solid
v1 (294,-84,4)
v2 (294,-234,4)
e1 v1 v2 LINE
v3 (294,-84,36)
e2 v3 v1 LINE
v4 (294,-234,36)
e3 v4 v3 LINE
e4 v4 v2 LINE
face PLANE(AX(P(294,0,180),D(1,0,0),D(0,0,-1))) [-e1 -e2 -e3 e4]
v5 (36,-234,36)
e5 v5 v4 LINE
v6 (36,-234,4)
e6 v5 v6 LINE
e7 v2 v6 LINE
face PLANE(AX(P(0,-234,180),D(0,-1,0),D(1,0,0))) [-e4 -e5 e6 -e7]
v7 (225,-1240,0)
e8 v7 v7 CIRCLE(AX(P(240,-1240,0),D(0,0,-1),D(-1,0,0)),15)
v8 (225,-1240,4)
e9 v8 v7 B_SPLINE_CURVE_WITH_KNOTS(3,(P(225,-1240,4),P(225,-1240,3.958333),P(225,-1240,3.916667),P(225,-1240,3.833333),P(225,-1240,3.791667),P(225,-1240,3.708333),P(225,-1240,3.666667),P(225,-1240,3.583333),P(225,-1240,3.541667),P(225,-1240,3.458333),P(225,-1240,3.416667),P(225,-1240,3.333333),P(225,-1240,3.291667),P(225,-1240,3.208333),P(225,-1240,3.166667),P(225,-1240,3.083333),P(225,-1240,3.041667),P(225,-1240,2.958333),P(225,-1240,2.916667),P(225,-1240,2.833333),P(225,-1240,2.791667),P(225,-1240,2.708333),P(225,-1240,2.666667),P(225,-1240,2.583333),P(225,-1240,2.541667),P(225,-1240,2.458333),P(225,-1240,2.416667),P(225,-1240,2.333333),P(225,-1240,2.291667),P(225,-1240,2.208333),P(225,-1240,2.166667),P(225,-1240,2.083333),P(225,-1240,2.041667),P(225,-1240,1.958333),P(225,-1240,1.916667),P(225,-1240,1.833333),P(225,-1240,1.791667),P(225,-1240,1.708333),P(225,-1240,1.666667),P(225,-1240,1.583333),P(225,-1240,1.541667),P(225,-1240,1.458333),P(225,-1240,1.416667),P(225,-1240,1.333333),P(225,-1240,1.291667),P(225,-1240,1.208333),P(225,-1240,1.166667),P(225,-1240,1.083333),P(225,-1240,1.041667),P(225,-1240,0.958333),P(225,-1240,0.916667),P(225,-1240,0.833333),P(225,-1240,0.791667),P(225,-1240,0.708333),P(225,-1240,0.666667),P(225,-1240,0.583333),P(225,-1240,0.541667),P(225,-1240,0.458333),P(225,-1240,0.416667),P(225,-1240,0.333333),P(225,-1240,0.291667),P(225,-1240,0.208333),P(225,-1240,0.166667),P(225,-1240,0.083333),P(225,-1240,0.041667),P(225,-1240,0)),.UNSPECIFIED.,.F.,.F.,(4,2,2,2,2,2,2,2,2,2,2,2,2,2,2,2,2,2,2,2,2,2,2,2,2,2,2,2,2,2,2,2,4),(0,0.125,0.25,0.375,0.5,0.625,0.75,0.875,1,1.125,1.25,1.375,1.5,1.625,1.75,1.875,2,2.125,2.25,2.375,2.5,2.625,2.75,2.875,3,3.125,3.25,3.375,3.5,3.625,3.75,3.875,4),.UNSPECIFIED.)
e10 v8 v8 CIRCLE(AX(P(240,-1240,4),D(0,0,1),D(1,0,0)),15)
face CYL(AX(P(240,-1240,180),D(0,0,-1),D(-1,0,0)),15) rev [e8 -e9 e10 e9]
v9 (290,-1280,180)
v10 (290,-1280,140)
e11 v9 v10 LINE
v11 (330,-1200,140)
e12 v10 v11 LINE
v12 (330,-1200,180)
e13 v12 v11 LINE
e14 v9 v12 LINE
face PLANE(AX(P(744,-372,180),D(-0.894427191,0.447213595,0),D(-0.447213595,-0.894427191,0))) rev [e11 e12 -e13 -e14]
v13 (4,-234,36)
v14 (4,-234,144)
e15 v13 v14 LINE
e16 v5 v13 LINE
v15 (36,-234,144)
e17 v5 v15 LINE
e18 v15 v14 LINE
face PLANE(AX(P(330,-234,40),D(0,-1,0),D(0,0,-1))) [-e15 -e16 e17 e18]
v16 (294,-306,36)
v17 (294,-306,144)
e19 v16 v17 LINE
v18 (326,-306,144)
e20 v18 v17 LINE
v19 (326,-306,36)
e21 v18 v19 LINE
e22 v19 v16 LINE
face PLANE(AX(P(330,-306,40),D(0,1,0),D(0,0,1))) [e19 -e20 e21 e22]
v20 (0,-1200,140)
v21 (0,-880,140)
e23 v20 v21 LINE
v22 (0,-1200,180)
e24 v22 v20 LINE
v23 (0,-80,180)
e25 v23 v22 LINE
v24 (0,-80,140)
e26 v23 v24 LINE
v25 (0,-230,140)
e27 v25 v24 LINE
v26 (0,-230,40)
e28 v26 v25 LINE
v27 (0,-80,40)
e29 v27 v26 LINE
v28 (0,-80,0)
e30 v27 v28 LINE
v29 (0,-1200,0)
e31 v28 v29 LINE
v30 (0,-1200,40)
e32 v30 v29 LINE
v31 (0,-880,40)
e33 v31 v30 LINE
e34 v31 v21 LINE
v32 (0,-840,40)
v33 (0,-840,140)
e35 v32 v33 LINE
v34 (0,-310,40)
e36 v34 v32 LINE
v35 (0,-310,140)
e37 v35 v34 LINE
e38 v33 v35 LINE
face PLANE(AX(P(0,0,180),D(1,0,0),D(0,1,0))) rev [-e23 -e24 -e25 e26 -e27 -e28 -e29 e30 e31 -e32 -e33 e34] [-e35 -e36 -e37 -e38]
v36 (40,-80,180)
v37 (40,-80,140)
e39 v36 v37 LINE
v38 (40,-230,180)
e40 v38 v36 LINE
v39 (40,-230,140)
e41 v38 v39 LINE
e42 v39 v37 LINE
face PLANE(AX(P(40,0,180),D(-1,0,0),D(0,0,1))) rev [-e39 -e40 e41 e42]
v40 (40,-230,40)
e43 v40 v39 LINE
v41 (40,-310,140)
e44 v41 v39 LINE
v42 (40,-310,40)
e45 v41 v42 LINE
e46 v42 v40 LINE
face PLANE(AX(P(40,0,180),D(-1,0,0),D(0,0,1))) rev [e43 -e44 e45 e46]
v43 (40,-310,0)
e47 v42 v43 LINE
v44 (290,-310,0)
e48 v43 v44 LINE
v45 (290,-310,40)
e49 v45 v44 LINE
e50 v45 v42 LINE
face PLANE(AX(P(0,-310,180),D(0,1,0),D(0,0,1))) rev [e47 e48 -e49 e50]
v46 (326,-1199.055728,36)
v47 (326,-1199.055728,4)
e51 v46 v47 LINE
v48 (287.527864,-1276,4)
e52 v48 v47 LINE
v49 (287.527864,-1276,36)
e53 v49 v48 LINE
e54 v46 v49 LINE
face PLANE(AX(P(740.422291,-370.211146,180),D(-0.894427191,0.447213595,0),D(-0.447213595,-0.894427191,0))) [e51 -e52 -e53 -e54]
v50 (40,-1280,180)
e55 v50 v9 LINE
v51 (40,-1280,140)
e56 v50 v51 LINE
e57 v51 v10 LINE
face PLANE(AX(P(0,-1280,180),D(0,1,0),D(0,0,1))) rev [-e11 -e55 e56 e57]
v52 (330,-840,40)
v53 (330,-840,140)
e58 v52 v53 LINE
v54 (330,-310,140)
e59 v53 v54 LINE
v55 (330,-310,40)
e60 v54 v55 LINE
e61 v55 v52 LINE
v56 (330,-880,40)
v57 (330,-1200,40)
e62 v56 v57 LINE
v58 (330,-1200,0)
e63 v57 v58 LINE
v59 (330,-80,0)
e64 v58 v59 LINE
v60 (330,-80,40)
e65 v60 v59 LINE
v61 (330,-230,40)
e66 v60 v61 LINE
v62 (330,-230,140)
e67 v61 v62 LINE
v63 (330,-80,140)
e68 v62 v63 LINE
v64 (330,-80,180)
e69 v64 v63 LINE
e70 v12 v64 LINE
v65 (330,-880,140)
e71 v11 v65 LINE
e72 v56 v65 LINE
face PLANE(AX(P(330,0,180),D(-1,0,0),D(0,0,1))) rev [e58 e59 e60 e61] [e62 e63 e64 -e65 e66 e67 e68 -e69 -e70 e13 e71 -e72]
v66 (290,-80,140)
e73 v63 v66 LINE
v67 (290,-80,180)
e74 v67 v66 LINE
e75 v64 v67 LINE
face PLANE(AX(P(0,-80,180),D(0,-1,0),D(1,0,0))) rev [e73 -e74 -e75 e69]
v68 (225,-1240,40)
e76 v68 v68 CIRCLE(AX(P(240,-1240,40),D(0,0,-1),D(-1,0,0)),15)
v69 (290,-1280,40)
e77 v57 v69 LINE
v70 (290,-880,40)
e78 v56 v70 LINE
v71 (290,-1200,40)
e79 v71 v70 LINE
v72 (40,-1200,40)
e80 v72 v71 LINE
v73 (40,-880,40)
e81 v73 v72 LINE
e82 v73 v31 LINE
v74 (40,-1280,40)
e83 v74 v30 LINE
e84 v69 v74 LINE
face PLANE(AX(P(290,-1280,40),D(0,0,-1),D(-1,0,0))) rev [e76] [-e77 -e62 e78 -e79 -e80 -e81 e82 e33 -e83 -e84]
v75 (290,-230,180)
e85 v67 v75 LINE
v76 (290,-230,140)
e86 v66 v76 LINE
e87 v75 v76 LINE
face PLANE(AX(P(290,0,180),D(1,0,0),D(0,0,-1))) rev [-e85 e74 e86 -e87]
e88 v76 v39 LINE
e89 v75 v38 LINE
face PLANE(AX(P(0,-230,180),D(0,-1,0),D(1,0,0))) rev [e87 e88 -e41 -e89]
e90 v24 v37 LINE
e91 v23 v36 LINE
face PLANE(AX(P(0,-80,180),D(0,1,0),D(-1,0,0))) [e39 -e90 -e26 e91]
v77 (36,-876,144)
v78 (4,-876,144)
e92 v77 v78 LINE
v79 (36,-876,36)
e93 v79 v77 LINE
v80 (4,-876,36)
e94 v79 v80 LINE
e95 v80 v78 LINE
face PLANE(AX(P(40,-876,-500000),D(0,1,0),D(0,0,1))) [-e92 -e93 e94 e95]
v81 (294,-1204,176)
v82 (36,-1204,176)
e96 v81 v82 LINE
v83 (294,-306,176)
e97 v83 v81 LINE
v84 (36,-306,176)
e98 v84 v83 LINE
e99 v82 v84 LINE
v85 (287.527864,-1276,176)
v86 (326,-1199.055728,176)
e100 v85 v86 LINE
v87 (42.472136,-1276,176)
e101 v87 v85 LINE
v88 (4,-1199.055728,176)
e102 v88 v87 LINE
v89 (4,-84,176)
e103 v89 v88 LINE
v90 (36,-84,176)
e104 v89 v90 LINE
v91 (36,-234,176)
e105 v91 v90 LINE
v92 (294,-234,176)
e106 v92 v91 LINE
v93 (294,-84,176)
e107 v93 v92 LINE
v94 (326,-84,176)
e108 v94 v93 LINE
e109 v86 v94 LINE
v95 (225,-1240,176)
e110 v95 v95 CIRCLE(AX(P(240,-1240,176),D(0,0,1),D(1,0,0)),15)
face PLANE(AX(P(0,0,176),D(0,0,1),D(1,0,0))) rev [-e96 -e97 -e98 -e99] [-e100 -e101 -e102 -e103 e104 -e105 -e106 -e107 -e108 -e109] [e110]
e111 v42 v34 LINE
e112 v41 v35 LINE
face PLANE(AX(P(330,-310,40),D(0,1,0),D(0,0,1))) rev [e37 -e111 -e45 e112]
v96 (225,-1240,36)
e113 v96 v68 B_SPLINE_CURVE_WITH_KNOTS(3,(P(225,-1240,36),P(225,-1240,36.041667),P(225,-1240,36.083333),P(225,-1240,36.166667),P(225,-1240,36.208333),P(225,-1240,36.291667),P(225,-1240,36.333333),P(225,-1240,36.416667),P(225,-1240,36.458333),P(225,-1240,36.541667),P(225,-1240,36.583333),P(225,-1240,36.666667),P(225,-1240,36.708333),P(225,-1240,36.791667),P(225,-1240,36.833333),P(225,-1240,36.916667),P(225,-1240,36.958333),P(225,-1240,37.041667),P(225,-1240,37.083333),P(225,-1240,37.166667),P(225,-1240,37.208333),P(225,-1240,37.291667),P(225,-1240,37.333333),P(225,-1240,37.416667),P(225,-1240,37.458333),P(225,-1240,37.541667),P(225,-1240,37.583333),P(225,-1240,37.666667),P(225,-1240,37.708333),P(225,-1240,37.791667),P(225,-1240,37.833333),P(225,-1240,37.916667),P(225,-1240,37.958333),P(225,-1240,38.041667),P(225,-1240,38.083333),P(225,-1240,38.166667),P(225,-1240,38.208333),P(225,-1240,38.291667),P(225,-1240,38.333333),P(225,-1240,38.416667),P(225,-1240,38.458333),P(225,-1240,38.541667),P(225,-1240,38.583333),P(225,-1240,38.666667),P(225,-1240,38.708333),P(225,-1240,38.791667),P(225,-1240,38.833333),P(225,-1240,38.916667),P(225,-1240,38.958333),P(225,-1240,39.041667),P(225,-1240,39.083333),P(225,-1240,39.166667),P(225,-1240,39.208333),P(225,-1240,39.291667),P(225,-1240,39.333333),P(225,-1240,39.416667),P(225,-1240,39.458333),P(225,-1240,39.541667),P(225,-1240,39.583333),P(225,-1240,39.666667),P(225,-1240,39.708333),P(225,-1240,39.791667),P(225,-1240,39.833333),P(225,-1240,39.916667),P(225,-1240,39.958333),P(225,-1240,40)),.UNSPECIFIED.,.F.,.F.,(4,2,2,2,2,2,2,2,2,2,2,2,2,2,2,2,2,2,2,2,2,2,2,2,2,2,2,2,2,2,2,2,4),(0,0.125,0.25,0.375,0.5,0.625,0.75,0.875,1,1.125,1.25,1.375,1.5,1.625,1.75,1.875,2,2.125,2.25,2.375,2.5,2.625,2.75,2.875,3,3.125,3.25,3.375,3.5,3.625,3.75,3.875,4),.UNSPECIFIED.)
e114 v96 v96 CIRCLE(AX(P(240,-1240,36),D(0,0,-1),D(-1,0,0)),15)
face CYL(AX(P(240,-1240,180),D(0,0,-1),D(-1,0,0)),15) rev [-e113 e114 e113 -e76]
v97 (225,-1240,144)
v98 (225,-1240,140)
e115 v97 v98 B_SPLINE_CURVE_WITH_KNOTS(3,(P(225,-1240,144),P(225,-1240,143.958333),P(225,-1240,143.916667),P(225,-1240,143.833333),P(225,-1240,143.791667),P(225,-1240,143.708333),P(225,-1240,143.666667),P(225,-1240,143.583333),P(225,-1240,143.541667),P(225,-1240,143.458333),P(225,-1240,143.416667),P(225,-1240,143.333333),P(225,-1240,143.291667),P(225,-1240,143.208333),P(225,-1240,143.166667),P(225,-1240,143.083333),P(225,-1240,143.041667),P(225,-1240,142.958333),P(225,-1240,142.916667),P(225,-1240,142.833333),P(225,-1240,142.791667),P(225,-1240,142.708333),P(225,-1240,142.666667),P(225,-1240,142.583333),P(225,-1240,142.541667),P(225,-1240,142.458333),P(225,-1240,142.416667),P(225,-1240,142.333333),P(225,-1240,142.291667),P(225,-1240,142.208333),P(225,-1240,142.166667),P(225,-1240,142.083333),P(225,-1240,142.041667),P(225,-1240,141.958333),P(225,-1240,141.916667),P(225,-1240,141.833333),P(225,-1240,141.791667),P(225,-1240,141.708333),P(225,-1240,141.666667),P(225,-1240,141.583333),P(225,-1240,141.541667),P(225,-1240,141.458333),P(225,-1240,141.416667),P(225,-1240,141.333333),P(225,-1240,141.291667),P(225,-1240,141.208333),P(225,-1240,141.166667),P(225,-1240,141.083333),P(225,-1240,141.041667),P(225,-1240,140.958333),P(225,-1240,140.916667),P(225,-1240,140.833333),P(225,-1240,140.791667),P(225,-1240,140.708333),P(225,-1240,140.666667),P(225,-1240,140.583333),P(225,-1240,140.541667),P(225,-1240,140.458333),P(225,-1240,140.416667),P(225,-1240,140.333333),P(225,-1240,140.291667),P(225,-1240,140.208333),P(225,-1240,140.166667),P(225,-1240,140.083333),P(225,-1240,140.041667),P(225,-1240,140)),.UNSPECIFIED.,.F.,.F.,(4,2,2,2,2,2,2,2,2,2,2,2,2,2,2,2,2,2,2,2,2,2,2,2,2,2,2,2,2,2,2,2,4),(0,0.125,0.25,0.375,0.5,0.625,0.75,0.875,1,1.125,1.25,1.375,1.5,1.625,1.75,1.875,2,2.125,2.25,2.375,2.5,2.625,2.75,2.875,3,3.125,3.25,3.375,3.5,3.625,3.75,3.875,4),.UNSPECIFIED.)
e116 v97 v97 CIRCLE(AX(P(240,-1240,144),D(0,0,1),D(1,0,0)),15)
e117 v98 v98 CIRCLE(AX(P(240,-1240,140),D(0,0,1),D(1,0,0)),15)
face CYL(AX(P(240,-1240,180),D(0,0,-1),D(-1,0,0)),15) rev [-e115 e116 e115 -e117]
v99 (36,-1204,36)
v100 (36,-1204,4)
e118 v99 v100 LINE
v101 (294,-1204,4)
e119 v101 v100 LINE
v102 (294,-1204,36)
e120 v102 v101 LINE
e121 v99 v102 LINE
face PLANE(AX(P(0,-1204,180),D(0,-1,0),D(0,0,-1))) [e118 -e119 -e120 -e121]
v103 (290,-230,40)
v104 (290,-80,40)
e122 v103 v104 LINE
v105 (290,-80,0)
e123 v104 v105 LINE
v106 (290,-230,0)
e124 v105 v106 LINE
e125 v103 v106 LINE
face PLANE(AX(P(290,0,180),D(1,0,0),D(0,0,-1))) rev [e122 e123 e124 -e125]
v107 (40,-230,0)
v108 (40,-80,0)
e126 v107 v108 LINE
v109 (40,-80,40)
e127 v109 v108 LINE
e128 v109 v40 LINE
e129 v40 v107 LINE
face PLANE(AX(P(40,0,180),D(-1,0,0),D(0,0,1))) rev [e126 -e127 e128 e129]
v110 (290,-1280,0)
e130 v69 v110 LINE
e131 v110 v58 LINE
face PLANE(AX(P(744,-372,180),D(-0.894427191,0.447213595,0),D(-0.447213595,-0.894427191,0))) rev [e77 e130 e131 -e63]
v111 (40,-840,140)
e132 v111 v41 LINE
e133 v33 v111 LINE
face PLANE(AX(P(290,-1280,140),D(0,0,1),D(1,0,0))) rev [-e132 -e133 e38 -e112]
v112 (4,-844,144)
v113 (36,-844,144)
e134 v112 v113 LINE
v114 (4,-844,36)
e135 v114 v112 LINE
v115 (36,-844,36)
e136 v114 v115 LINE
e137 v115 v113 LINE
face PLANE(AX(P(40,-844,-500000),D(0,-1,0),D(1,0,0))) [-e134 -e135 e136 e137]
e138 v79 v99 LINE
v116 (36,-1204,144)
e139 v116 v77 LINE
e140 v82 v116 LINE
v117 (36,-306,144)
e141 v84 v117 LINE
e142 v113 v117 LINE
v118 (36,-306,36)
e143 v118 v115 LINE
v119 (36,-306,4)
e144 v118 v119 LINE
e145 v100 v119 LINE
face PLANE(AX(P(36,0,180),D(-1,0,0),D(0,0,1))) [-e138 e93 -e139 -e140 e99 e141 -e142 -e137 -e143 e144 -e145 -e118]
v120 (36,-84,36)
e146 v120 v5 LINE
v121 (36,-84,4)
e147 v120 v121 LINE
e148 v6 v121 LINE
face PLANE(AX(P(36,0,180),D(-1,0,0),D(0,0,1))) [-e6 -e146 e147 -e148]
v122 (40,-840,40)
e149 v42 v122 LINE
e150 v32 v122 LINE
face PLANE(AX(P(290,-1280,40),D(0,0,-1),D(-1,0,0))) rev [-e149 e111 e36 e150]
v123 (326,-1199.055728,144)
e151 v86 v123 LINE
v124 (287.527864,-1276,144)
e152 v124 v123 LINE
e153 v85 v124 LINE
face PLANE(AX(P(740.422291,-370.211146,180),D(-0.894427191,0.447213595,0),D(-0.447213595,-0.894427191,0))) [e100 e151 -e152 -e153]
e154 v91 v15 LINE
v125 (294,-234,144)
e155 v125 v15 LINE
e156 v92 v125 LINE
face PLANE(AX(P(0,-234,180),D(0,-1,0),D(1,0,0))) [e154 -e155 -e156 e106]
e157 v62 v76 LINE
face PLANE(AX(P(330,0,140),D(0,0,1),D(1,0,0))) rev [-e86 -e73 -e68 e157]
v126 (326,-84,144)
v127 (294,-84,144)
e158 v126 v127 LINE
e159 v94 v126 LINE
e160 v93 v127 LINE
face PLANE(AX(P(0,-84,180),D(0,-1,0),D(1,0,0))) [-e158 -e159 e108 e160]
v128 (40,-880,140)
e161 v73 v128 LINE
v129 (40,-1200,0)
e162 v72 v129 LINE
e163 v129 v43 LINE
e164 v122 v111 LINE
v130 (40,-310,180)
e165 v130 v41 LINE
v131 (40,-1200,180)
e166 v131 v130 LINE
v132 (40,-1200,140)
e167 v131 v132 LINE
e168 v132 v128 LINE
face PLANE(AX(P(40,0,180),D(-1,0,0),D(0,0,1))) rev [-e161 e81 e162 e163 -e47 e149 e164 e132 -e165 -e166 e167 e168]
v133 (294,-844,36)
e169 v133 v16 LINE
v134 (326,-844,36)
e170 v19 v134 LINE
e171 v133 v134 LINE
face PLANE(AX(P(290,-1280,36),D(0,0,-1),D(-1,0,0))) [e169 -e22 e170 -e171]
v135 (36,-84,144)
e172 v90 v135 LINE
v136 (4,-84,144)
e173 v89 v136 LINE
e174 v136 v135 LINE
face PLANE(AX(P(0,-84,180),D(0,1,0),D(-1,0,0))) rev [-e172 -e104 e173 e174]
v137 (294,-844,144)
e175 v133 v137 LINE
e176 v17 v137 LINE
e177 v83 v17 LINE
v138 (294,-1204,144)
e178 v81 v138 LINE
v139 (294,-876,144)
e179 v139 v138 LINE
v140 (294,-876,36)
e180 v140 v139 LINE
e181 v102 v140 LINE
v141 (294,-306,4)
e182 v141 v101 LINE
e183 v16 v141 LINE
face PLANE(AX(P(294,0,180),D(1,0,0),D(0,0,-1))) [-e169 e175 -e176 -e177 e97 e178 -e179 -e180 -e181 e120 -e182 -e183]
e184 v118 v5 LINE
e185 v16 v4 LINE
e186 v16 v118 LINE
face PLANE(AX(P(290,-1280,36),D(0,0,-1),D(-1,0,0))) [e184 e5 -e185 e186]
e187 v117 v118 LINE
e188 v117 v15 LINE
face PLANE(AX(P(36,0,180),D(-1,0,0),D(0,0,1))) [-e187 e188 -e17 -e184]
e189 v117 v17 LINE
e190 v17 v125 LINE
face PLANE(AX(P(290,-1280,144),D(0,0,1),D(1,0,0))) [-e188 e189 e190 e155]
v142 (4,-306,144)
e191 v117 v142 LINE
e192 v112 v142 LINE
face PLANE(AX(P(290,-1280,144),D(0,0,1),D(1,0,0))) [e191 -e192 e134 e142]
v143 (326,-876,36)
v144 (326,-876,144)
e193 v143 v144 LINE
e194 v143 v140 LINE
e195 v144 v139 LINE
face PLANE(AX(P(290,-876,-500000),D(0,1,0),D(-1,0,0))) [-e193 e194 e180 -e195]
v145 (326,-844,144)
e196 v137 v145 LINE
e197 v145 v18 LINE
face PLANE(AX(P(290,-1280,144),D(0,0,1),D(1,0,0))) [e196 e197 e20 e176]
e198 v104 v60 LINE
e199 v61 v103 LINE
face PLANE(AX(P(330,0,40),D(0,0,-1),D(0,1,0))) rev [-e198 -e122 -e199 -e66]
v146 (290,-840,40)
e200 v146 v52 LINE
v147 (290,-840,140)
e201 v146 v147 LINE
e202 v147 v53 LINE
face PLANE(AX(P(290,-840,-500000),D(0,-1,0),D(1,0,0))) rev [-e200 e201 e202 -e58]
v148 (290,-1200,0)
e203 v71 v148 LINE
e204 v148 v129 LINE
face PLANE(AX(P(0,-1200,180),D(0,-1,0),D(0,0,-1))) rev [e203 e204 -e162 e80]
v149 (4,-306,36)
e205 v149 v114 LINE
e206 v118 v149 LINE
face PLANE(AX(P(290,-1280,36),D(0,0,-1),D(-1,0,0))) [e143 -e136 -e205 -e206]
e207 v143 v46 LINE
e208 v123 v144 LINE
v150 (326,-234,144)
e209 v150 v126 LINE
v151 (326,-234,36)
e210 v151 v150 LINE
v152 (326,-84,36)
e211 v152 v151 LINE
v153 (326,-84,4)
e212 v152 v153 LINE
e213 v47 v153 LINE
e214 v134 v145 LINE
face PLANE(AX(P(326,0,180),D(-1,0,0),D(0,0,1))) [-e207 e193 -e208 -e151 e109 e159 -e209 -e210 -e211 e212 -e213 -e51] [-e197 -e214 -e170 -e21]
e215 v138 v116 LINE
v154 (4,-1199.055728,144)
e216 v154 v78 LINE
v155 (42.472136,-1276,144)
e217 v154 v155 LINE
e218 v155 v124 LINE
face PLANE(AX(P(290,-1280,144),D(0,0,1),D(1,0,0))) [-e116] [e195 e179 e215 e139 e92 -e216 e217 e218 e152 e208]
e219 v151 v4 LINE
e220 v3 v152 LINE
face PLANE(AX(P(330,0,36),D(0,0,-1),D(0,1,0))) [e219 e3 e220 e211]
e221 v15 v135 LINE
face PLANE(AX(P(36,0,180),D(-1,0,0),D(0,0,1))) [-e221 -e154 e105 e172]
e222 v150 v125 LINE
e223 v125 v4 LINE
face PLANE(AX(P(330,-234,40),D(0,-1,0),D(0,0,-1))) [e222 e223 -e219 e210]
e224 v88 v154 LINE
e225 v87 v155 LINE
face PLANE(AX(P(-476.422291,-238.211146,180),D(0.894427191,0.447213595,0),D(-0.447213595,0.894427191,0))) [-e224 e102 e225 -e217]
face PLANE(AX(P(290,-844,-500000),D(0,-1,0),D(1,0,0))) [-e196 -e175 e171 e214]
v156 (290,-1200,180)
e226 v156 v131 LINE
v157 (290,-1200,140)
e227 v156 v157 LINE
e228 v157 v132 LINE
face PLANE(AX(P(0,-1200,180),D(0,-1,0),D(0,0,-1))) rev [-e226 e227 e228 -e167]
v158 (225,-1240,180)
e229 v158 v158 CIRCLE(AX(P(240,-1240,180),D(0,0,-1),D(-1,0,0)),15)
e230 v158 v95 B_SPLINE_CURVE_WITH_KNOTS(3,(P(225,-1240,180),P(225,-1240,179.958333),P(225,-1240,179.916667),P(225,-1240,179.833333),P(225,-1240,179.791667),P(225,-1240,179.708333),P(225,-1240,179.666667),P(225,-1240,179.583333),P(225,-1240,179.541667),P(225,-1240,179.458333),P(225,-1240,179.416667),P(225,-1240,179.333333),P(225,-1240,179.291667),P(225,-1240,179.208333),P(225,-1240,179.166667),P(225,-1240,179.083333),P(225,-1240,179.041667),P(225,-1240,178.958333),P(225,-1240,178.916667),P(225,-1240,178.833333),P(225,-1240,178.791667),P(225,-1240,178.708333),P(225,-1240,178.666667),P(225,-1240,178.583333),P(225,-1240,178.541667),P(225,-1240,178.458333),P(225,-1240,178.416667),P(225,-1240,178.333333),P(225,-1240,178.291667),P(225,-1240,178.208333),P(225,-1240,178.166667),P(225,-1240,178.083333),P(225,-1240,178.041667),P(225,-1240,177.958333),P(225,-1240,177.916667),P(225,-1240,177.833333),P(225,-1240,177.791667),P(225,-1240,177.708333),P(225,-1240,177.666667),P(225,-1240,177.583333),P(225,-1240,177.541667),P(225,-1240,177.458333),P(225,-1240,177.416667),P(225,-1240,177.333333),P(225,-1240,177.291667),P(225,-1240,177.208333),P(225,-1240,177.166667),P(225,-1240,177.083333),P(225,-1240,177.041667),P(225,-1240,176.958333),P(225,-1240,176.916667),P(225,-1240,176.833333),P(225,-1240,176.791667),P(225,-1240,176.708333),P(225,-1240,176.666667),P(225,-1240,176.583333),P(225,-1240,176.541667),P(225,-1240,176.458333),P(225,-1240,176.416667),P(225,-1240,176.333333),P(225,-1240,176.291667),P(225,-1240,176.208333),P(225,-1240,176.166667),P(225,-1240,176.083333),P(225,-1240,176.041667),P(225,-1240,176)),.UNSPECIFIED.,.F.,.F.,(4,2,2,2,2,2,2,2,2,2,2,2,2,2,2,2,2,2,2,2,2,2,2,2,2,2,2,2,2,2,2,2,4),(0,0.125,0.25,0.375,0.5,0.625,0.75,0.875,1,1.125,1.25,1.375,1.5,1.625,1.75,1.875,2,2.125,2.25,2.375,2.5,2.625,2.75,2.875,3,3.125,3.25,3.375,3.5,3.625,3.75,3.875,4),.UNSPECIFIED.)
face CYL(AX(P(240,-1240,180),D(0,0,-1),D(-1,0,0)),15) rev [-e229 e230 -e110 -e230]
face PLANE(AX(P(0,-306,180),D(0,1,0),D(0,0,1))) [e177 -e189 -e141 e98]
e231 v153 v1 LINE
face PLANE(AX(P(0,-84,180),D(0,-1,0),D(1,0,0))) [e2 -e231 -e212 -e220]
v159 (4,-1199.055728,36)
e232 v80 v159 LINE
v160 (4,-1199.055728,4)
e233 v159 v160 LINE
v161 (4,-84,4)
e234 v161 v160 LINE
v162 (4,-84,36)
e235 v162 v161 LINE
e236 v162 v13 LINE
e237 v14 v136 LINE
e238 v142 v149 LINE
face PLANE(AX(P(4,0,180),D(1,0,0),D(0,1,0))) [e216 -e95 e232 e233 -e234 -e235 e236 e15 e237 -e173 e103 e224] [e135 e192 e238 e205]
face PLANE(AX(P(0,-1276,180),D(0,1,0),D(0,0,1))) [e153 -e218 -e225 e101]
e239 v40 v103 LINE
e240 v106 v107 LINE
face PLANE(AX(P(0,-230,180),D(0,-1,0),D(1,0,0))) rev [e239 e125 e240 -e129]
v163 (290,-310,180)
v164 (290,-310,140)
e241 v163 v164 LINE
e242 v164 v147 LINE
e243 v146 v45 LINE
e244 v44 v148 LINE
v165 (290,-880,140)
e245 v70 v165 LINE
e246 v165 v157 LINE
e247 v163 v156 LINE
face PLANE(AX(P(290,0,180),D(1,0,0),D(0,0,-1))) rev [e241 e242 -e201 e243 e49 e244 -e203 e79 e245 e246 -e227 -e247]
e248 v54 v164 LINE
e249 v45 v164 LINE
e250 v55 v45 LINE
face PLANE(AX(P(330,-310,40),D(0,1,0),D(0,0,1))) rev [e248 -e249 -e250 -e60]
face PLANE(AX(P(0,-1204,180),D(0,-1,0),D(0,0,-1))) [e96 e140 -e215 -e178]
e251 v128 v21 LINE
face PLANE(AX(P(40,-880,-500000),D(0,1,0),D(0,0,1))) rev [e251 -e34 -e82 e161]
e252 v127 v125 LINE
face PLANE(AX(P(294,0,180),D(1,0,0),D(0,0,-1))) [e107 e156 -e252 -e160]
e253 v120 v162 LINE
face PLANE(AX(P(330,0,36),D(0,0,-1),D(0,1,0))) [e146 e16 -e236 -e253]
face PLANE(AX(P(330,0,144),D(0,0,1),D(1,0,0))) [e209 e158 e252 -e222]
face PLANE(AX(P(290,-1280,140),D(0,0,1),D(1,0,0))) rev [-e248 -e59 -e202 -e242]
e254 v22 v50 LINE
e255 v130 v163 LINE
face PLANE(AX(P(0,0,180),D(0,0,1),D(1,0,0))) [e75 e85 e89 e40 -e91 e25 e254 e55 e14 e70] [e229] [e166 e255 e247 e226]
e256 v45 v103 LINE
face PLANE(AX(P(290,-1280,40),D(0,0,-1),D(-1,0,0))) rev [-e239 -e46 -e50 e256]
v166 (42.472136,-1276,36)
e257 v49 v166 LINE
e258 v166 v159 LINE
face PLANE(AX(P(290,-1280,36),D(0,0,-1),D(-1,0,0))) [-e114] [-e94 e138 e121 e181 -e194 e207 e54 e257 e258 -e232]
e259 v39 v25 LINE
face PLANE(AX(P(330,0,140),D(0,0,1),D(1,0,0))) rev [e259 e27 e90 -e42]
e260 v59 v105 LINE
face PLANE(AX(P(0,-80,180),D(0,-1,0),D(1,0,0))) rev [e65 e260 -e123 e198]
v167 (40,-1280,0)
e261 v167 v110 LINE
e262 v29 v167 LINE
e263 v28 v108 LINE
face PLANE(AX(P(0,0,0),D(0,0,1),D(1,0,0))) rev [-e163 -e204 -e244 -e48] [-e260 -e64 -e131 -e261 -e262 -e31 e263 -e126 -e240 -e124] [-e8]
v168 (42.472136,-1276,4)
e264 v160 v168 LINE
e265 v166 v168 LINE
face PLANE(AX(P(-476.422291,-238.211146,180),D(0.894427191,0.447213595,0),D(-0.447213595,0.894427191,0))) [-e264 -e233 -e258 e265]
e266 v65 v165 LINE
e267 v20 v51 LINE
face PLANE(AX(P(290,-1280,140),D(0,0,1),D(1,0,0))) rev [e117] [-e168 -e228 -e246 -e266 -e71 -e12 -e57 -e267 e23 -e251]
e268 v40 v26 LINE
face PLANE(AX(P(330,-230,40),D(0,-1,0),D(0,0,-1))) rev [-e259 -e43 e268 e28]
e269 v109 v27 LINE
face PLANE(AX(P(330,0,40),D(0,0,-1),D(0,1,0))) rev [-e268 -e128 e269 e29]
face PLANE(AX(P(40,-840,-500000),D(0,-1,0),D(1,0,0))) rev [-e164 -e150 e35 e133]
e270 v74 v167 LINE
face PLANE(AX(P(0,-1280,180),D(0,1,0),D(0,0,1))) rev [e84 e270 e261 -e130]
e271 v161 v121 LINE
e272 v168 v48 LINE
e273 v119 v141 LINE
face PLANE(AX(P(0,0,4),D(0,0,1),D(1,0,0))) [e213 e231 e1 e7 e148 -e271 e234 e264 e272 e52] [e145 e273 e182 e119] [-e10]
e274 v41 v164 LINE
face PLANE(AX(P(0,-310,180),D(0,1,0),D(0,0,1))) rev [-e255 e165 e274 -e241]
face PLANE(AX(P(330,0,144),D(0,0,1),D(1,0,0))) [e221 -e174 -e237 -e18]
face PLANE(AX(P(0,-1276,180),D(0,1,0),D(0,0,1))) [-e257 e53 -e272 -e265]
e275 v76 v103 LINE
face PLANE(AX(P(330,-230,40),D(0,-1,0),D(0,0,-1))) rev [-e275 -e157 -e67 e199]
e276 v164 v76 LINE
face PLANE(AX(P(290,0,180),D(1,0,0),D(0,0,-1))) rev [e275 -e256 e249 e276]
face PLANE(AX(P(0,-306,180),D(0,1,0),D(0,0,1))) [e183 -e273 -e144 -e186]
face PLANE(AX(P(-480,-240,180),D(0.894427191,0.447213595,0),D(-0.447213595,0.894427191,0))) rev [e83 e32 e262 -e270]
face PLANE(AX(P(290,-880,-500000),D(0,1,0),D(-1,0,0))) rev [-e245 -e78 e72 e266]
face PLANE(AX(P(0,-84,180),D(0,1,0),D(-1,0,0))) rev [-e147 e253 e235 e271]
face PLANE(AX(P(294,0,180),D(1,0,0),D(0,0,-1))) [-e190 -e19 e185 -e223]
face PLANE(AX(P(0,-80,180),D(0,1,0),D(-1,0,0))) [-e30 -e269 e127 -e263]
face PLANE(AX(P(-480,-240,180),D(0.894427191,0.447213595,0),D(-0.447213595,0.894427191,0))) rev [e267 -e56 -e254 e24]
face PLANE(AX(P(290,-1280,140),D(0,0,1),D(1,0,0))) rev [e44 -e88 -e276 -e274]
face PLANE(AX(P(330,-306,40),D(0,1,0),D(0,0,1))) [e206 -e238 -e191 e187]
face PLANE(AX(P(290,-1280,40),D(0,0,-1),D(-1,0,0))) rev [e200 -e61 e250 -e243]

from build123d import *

# Parameters (mm, degrees)
ESQUISSE1_W                  = 250
ESQUISSE1_H                  = 890
BOSS_EXTRU_1_DEPTH           = 180
ESQUISSE2_W                  = 250
ESQUISSE2_H                  = 100
ENL_V_MAT_EXTRU_1_DEPTH      = 1258.497514908
ENL_V_MAT_EXTRU_2_DEPTH      = 1325.726386844
ENL_V_MAT_EXTRU_2_DEPTH_BACK = 1325.726386844
ESQUISSE3_W                  = 100
ESQUISSE3_H                  = 230
ESQUISSE3_H_2                = 970
BOSS_EXTRU_2_REACH           = 1331.248
ESQUISSE6_W                  = 40
ESQUISSE6_H                  = 40
COQUE1_START                 = 4
COQUE1_OUTLINE_W             = 258
COQUE1_OUTLINE_H             = 898
COQUE1_DEPTH                 = 32
COQUE1_START_2               = 144
COQUE1_2_OUTLINE_W           = 258
COQUE1_2_OUTLINE_H           = 898
COQUE1_2_DEPTH               = 32
COQUE1_START_3               = 36
COQUE1_3_OUTLINE_W           = 32
COQUE1_3_OUTLINE_H           = 72
COQUE1_3_OUTLINE_H_2         = 32
COQUE1_3_DEPTH               = 108
ESQUISSE8_R                  = 15
ENL_V_MAT_EXTRU_5_DEPTH      = 1335.053971922


# Read off the part's stored shape, not the designer's step: Coque1
with BuildPart() as part:
    # Esquisse1 → Boss.-Extru.1 (new body)
    with BuildSketch(Plane.XY):
        Polygon((0, -80), (0, -1200), (40, -1280), (290, -1280), (330, -1200), (330, -80), (290, -80), (290, -230), (40, -230), (40, -80), align=None)
        with Locations((165, -755)):
            Rectangle(ESQUISSE1_W, ESQUISSE1_H, mode=Mode.SUBTRACT)
    extrude(amount=BOSS_EXTRU_1_DEPTH)

    # Esquisse2 → Enlèv. mat.-Extru.1 (cut, through all)
    with BuildSketch(Plane(origin=(0, -80, 0), x_dir=(1, 0, 0), z_dir=(0, 1, 0))):
        with Locations((165, -90)):
            Rectangle(ESQUISSE2_W, ESQUISSE2_H)
    extrude(amount=-ENL_V_MAT_EXTRU_1_DEPTH, mode=Mode.SUBTRACT)

    # Esquisse3 → Enlèv. mat.-Extru.2 (cut, two sides: drawn at the far end of the back side and taken through both)
    with BuildSketch(Plane.ZY.offset(-290).offset(-ENL_V_MAT_EXTRU_2_DEPTH_BACK)):
        with Locations((90, -115)):
            Rectangle(ESQUISSE3_W, ESQUISSE3_H)
        with Locations((90, -795)):
            Rectangle(ESQUISSE3_W, ESQUISSE3_H_2)
    extrude(amount=ENL_V_MAT_EXTRU_2_DEPTH + ENL_V_MAT_EXTRU_2_DEPTH_BACK, mode=Mode.SUBTRACT)

    # Esquisse6 → Boss.-Extru.2 (add, up to next)
    with BuildSketch(Plane(origin=(0, 0, 140), x_dir=(-1, 0, 0), z_dir=(0, 0, -1)), mode=Mode.PRIVATE) as boss_extru_2_sk1:
        with Locations((-310, -860)):
            Rectangle(ESQUISSE6_W, ESQUISSE6_H)
    boss_extru_2_tool1 = extrude(boss_extru_2_sk1.sketch, amount=BOSS_EXTRU_2_REACH, mode=Mode.PRIVATE) - part.part
    # Esquisse6 → Boss.-Extru.2 (add, up to next)
    with BuildSketch(Plane(origin=(0, 0, 140), x_dir=(-1, 0, 0), z_dir=(0, 0, -1)), mode=Mode.PRIVATE) as boss_extru_2_sk2:
        with Locations((-20, -860)):
            Rectangle(ESQUISSE6_W, ESQUISSE6_H)
    boss_extru_2_tool2 = extrude(boss_extru_2_sk2.sketch, amount=BOSS_EXTRU_2_REACH, mode=Mode.PRIVATE) - part.part
    add(boss_extru_2_tool1.solids().sort_by_distance((310, -860, 140))[0])
    add(boss_extru_2_tool2.solids().sort_by_distance((20, -860, 140))[0])

    # Coque1 outline → Coque1 (cut)
    with BuildSketch(Plane.XY.offset(COQUE1_START)):
        Polygon((294, -234), (36, -234), (36, -84), (4, -84), (4, -1199.05572809), (42.472135955, -1276), (287.527864045, -1276), (326, -1199.05572809), (326, -84), (294, -84), align=None)
        with Locations((165, -755)):
            Rectangle(COQUE1_OUTLINE_W, COQUE1_OUTLINE_H, mode=Mode.SUBTRACT)
    extrude(amount=COQUE1_DEPTH, mode=Mode.SUBTRACT)

    # Coque1 2 outline → Coque1 2 (cut)
    with BuildSketch(Plane.XY.offset(COQUE1_START_2)):
        Polygon((294, -234), (36, -234), (36, -84), (4, -84), (4, -1199.05572809), (42.472135955, -1276), (287.527864045, -1276), (326, -1199.05572809), (326, -84), (294, -84), align=None)
        with Locations((165, -755)):
            Rectangle(COQUE1_2_OUTLINE_W, COQUE1_2_OUTLINE_H, mode=Mode.SUBTRACT)
    extrude(amount=COQUE1_2_DEPTH, mode=Mode.SUBTRACT)

    # Coque1 3 outline → Coque1 3 (cut)
    with BuildSketch(Plane.XY.offset(COQUE1_START_3)):
        with Locations((310, -270)):
            Rectangle(COQUE1_3_OUTLINE_W, COQUE1_3_OUTLINE_H)
        with Locations((310, -860)):
            Rectangle(COQUE1_3_OUTLINE_W, COQUE1_3_OUTLINE_H_2)
        with Locations((20, -270)):
            Rectangle(COQUE1_3_OUTLINE_W, COQUE1_3_OUTLINE_H)
        with Locations((20, -860)):
            Rectangle(COQUE1_3_OUTLINE_W, COQUE1_3_OUTLINE_H_2)
    extrude(amount=COQUE1_3_DEPTH, mode=Mode.SUBTRACT)

    # Esquisse8 → Enlèv. mat.-Extru.5 (cut, through all)
    with BuildSketch(Plane(origin=(0, 0, 0), x_dir=(-1, 0, 0), z_dir=(0, 0, -1))):
        with Locations((-240, -1240)):
            Circle(ESQUISSE8_R)
    extrude(amount=-ENL_V_MAT_EXTRU_5_DEPTH, mode=Mode.SUBTRACT)


solid = part.part
